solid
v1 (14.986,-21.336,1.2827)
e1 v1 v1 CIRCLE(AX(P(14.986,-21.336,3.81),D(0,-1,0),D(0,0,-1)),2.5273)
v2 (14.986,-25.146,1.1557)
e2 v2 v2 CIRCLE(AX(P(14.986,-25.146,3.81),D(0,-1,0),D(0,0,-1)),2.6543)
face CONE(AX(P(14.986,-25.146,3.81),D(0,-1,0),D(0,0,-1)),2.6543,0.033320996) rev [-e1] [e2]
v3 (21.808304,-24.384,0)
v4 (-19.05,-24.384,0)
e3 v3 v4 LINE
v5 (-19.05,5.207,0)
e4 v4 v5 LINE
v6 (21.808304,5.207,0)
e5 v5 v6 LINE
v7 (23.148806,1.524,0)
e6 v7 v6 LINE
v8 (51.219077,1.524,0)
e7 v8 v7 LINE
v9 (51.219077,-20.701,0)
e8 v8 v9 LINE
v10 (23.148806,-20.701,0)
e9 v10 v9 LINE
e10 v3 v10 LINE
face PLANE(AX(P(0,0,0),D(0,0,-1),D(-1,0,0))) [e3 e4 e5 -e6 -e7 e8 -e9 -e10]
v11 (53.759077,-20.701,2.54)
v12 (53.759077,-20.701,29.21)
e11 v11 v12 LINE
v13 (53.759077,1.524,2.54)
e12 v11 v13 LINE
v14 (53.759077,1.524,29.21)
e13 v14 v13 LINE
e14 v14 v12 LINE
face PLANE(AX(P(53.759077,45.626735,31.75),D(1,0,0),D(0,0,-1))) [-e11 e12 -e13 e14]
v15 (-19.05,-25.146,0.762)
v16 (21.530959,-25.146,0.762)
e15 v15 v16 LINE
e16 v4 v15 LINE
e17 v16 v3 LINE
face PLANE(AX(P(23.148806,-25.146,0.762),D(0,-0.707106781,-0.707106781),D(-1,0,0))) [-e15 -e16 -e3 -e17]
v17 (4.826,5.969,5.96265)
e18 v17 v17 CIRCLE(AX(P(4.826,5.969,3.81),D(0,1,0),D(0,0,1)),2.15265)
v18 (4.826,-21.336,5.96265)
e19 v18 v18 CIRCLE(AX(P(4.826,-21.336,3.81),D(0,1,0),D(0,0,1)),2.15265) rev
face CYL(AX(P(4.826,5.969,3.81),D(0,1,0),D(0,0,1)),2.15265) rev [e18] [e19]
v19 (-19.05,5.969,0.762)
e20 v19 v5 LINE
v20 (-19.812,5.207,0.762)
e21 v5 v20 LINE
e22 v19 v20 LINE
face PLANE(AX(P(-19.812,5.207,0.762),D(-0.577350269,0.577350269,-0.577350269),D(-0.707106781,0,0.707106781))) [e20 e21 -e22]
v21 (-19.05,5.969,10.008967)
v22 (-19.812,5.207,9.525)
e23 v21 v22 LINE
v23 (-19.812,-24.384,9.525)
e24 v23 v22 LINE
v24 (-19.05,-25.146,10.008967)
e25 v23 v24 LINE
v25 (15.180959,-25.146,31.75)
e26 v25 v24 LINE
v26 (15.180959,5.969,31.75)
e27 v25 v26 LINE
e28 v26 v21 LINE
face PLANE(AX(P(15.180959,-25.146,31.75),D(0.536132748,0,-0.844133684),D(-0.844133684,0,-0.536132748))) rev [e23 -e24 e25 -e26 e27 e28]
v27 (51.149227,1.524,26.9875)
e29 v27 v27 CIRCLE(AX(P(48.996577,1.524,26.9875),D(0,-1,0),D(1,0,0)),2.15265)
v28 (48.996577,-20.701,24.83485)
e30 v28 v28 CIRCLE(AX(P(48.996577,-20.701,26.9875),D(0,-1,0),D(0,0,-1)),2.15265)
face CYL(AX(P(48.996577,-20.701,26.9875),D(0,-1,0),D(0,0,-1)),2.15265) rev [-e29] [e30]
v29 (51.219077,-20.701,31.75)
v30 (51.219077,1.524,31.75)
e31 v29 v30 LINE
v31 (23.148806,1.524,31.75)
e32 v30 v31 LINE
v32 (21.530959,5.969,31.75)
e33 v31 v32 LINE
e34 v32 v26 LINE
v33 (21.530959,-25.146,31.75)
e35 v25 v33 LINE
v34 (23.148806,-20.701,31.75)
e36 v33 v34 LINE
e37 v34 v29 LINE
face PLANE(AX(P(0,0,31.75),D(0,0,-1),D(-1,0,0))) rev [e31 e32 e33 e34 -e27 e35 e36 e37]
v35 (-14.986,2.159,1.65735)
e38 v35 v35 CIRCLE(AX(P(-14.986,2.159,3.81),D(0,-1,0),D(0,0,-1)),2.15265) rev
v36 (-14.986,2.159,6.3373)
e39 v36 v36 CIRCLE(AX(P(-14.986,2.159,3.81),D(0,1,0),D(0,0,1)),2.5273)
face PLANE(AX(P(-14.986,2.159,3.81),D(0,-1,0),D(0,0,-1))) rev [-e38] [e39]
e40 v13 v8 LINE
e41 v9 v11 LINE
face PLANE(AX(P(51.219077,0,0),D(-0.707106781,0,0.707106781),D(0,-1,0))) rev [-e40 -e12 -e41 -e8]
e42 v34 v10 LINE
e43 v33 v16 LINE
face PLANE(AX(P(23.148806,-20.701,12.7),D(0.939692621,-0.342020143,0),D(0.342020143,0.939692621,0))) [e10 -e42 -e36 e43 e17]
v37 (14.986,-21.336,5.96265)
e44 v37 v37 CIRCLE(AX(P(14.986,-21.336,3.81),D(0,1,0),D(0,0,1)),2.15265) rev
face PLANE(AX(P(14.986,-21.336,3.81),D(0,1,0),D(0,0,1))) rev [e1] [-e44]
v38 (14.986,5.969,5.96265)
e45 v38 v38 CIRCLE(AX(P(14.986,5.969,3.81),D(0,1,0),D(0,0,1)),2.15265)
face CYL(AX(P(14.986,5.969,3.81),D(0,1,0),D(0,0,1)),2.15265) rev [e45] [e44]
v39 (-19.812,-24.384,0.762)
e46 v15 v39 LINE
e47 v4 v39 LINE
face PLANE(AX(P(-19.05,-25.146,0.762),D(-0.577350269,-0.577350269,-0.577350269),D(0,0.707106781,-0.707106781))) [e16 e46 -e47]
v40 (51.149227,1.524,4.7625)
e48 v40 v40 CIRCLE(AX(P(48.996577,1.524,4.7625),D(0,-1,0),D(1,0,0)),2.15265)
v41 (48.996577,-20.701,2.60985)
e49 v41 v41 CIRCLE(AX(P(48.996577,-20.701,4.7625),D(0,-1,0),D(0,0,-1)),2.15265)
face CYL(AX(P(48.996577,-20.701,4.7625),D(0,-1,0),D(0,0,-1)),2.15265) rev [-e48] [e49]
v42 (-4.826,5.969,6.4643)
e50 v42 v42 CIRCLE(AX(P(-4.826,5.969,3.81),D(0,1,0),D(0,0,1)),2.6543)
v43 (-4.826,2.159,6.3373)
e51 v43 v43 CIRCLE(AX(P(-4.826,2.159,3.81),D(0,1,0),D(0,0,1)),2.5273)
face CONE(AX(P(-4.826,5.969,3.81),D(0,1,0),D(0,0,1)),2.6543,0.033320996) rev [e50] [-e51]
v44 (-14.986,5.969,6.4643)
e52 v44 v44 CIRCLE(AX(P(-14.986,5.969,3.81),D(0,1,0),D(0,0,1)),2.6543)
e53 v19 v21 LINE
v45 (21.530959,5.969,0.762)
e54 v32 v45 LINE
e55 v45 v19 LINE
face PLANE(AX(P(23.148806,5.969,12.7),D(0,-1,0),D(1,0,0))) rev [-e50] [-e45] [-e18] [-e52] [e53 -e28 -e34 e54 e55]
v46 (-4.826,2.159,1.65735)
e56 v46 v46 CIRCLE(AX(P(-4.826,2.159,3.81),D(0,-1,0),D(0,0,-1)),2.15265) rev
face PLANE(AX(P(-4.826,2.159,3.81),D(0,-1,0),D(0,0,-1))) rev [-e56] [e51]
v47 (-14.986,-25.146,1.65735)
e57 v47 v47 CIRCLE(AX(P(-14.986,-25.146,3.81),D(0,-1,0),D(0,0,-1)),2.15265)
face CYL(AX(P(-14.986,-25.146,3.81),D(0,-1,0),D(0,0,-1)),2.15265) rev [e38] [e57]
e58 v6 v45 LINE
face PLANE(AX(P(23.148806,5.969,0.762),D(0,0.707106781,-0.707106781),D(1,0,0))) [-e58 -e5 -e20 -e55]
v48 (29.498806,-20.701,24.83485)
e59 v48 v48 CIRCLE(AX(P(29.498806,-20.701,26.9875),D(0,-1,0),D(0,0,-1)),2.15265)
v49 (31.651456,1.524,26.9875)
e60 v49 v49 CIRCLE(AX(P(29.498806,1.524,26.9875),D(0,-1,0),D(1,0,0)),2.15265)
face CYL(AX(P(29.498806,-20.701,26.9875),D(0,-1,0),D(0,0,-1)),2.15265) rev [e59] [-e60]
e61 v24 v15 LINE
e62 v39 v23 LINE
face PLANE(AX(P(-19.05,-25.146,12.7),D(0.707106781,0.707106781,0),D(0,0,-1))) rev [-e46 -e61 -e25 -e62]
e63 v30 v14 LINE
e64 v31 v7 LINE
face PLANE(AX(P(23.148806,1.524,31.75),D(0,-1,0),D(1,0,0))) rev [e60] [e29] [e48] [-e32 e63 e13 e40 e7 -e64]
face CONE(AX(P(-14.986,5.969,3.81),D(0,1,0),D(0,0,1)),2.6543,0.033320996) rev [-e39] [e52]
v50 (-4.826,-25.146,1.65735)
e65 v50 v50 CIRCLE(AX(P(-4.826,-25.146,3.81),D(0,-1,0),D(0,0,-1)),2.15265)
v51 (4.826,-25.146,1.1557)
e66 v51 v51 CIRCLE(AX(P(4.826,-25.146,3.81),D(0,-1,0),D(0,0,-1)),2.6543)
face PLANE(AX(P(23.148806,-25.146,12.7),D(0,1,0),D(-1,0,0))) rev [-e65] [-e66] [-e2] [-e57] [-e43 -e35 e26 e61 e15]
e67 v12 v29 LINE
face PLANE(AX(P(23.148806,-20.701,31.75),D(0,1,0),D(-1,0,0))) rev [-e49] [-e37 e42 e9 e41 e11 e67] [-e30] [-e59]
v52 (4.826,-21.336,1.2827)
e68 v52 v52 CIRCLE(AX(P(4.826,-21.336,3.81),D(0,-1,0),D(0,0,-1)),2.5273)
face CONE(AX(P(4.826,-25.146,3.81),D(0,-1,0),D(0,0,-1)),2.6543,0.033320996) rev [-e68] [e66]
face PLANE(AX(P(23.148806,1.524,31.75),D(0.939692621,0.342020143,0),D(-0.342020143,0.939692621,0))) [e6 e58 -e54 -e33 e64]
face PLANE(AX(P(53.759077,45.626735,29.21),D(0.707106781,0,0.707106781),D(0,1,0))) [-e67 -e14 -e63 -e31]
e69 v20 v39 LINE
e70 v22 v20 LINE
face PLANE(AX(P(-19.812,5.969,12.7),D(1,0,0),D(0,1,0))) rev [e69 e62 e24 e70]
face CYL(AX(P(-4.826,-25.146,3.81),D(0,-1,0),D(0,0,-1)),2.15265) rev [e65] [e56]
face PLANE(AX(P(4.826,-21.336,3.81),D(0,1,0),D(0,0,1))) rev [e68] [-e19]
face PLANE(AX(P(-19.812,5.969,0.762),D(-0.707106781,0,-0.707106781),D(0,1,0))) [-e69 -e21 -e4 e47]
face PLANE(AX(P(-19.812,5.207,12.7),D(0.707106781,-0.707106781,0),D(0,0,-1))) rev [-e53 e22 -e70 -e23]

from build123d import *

# Parameters (mm, degrees)
SKETCH1_W                       = 42.960806382
SKETCH1_H                       = 31.115
BOSS_EXTRUDE1_DEPTH             = 12.7
SKETCH2_W                       = 42.960806382
SKETCH2_H                       = 22.225
BOSS_EXTRUDE2_DEPTH             = 19.05
BOSS_EXTRUDE3_DEPTH             = 22.225
DRAFT1_START                    = 15
DRAFT1_OUTLINE_W                = 22.225
DRAFT1_OUTLINE_H                = 19.270002336
DRAFT1_DEPTH                    = 6.752762537
BOSS_EXTRUDE4_REACH             = 69.308
SKETCH6_W                       = 42.960806382
SKETCH6_H                       = 4.445
DRAFT3_ANGLE                    = 20
DRAFT4_ANGLE                    = 20
BOSS_EXTRUDE5_DEPTH             = 22.225
F_6_CLEARANCE_HOLE1_D           = 4.3053
F_6_CLEARANCE_HOLE2_D           = 4.3053
F_6_CLEARANCE_HOLE2_ON_FACE_2_D = 4.3053
HOLE1_AT_2_COUNT                = 2
HOLE1_AT_2_PITCH                = 10.16
HOLE2_AT_2_COUNT                = 2
HOLE2_AT_2_PITCH                = 10.16
CUT_EXTRUDE1_DEPTH              = 70.758470007
CHAMFER1_SIZE                   = 2.54
CHAMFER2_SIZE                   = 0.762


with BuildPart() as part:
    # Sketch1 → Boss-Extrude1 (new body)
    with BuildSketch(Plane.XY):
        with Locations((1.668403191, -9.5885)):
            Rectangle(SKETCH1_W, SKETCH1_H)
    extrude(amount=BOSS_EXTRUDE1_DEPTH)

    # Sketch2 → Boss-Extrude2 (add)
    with BuildSketch(Plane.XY.offset(12.7)):
        with Locations((1.668403191, -9.5885)):
            Rectangle(SKETCH2_W, SKETCH2_H)
    extrude(amount=BOSS_EXTRUDE2_DEPTH)

    # Sketch3 → Boss-Extrude3 (add)
    with BuildSketch(Plane.XZ.offset(20.701)):
        Polygon((23.148806382, 31.75), (53.759077492, 31.75), (53.759077492, 0), (44.234077492, 0), (44.234077492, 18.107878998), (23.148806382, 18.107878998), align=None)
    extrude(amount=-BOSS_EXTRUDE3_DEPTH)

    # Draft1: read off the stored shape, not the designer's step
    # Draft1 outline → Draft1 (add)
    with BuildSketch(Plane(origin=(0, 0, 0), x_dir=(0, 1, 0), z_dir=(0.9396926207859083, 0, -0.3420201433256691)).offset(DRAFT1_START)):
        with Locations((-9.5885, 17.552359245)):
            Rectangle(DRAFT1_OUTLINE_W, DRAFT1_OUTLINE_H)
    extrude(amount=DRAFT1_DEPTH)

    # Sketch6 → Boss-Extrude4 (add, up to next)
    with BuildSketch(Plane.XY.offset(31.75), mode=Mode.PRIVATE) as boss_extrude4_sk1:
        with Locations((1.668403191, 3.7465)):
            Rectangle(SKETCH6_W, SKETCH6_H)
    boss_extrude4_tool1 = extrude(boss_extrude4_sk1.sketch, amount=-BOSS_EXTRUDE4_REACH, mode=Mode.PRIVATE) - part.part
    # Sketch6 → Boss-Extrude4 (add, up to next)
    with BuildSketch(Plane.XY.offset(31.75), mode=Mode.PRIVATE) as boss_extrude4_sk2:
        with Locations((1.668403191, -22.9235)):
            Rectangle(SKETCH6_W, SKETCH6_H)
    boss_extrude4_tool2 = extrude(boss_extrude4_sk2.sketch, amount=-BOSS_EXTRUDE4_REACH, mode=Mode.PRIVATE) - part.part
    add(boss_extrude4_tool1.solids().sort_by_distance((1.668403, 3.7465, 31.75))[0])
    add(boss_extrude4_tool2.solids().sort_by_distance((1.668403, -22.9235, 31.75))[0])

    # Draft3
    draft3_faces = [part.faces().sort_by_distance(p)[0] for p in [
        (23.148806382, -22.9235, 15.875),
    ]]
    draft(draft3_faces, Plane(origin=(23.148806382, -20.701, 31.75), x_dir=(-1, 0, 0), z_dir=(0, -1, 0)), DRAFT3_ANGLE)

    # Draft4
    draft4_faces = [part.faces().sort_by_distance(p)[0] for p in [
        (23.148806382, 3.7465, 15.875),
    ]]
    draft(draft4_faces, Plane(origin=(23.148806382, 1.524, 31.75), x_dir=(1, 0, 0), z_dir=(0, 1, 0)), DRAFT4_ANGLE)

    # Sketch8 → Boss-Extrude5 (add)
    with BuildSketch(Plane.XZ.offset(20.701)):
        Polygon((29.739535343, 18.107878998), (23.148806382, 0), (44.234077492, 0), (44.234077492, 18.107878998), align=None)
    extrude(amount=-BOSS_EXTRUDE5_DEPTH)

    # #6 Clearance Hole1 (through all)
    with Locations(Plane(origin=(0, -20.701, 0), x_dir=(-1, 0, 0), z_dir=(0, -1, 0))):
        with Locations((-48.996577492, -26.9875), (-48.996577492, -4.7625), (-29.498806382, -26.9875)):
            Hole(F_6_CLEARANCE_HOLE1_D / 2)

    # #6 Clearance Hole2 (through all)
    with Locations(Plane(origin=(-14.986, -25.146, 3.81), x_dir=(-1, 0, 0), z_dir=(0, -1, 0))):
        with Locations((0, 0), (-10.16, 0)):
            Hole(F_6_CLEARANCE_HOLE2_D / 2)

    # #6 Clearance Hole2 on face 2 (through all)
    with Locations(Plane(origin=(14.986, 5.969, 3.81), x_dir=(0, 0, 1), z_dir=(0, 1, 0))):
        with Locations((0, 0), (0, -10.16)):
            Hole(F_6_CLEARANCE_HOLE2_ON_FACE_2_D / 2)

    # Sketch18 → Hole1 (revolve, cut)
    with BuildSketch(Plane(origin=(-4.826, 5.969, 3.81), x_dir=(0, 0, 1), z_dir=(1, 0, 0))):
        Polygon((0, 0), (0, 3.81), (2.5273, 3.81), (2.6543, 0), align=None)
    hole1 = revolve(axis=Axis((-4.826, -104.031, 3.81), (0, 1, 0)), mode=Mode.SUBTRACT)

    # Hole1 at 2: Hole1 ×2
    with Locations(*[(-i * HOLE1_AT_2_PITCH, 0, 0) for i in range(1, HOLE1_AT_2_COUNT)]):
        add(hole1, mode=Mode.SUBTRACT)

    # Sketch20 → Hole2 (revolve, cut)
    with BuildSketch(Plane(origin=(4.826, -25.146, 3.81), x_dir=(0, 0, -1), z_dir=(1, 0, 0))):
        Polygon((0, 0), (0, 3.81), (2.5273, 3.81), (2.6543, 0), align=None)
    hole2 = revolve(axis=Axis((4.826, 84.854, 3.81), (0, -1, 0)), mode=Mode.SUBTRACT)

    # Hole2 at 2: Hole2 ×2
    with Locations(*[(i * HOLE2_AT_2_PITCH, 0, 0) for i in range(1, HOLE2_AT_2_COUNT)]):
        add(hole2, mode=Mode.SUBTRACT)

    # Sketch21 → Cut-Extrude1 (cut, through all)
    with BuildSketch(Plane(origin=(0, 5.969, 0), x_dir=(1, 0, 0), z_dir=(0, 1, 0))):
        Polygon((-19.812, -9.525), (-19.812, -31.75), (15.180958691, -31.75), align=None)
    extrude(amount=-CUT_EXTRUDE1_DEPTH, mode=Mode.SUBTRACT)

    # Chamfer1
    chamfer1_edges = [part.edges().sort_by_distance(p)[0] for p in [
        (53.759077492, -9.5885, 31.75),
        (53.759077492, -9.5885, 0),
    ]]
    chamfer(chamfer1_edges, length=CHAMFER1_SIZE)

    # Chamfer2
    chamfer2_edges = [part.edges().sort_by_distance(p)[0] for p in [
        (-19.812, -25.146, 4.7625),
        (-19.812, 5.969, 4.7625),
        (0.859479345, -25.146, 0),
        (-19.812, -9.5885, 0),
        (0.859479345, 5.969, 0),
    ]]
    chamfer(chamfer2_edges, length=CHAMFER2_SIZE)


solid = part.part
